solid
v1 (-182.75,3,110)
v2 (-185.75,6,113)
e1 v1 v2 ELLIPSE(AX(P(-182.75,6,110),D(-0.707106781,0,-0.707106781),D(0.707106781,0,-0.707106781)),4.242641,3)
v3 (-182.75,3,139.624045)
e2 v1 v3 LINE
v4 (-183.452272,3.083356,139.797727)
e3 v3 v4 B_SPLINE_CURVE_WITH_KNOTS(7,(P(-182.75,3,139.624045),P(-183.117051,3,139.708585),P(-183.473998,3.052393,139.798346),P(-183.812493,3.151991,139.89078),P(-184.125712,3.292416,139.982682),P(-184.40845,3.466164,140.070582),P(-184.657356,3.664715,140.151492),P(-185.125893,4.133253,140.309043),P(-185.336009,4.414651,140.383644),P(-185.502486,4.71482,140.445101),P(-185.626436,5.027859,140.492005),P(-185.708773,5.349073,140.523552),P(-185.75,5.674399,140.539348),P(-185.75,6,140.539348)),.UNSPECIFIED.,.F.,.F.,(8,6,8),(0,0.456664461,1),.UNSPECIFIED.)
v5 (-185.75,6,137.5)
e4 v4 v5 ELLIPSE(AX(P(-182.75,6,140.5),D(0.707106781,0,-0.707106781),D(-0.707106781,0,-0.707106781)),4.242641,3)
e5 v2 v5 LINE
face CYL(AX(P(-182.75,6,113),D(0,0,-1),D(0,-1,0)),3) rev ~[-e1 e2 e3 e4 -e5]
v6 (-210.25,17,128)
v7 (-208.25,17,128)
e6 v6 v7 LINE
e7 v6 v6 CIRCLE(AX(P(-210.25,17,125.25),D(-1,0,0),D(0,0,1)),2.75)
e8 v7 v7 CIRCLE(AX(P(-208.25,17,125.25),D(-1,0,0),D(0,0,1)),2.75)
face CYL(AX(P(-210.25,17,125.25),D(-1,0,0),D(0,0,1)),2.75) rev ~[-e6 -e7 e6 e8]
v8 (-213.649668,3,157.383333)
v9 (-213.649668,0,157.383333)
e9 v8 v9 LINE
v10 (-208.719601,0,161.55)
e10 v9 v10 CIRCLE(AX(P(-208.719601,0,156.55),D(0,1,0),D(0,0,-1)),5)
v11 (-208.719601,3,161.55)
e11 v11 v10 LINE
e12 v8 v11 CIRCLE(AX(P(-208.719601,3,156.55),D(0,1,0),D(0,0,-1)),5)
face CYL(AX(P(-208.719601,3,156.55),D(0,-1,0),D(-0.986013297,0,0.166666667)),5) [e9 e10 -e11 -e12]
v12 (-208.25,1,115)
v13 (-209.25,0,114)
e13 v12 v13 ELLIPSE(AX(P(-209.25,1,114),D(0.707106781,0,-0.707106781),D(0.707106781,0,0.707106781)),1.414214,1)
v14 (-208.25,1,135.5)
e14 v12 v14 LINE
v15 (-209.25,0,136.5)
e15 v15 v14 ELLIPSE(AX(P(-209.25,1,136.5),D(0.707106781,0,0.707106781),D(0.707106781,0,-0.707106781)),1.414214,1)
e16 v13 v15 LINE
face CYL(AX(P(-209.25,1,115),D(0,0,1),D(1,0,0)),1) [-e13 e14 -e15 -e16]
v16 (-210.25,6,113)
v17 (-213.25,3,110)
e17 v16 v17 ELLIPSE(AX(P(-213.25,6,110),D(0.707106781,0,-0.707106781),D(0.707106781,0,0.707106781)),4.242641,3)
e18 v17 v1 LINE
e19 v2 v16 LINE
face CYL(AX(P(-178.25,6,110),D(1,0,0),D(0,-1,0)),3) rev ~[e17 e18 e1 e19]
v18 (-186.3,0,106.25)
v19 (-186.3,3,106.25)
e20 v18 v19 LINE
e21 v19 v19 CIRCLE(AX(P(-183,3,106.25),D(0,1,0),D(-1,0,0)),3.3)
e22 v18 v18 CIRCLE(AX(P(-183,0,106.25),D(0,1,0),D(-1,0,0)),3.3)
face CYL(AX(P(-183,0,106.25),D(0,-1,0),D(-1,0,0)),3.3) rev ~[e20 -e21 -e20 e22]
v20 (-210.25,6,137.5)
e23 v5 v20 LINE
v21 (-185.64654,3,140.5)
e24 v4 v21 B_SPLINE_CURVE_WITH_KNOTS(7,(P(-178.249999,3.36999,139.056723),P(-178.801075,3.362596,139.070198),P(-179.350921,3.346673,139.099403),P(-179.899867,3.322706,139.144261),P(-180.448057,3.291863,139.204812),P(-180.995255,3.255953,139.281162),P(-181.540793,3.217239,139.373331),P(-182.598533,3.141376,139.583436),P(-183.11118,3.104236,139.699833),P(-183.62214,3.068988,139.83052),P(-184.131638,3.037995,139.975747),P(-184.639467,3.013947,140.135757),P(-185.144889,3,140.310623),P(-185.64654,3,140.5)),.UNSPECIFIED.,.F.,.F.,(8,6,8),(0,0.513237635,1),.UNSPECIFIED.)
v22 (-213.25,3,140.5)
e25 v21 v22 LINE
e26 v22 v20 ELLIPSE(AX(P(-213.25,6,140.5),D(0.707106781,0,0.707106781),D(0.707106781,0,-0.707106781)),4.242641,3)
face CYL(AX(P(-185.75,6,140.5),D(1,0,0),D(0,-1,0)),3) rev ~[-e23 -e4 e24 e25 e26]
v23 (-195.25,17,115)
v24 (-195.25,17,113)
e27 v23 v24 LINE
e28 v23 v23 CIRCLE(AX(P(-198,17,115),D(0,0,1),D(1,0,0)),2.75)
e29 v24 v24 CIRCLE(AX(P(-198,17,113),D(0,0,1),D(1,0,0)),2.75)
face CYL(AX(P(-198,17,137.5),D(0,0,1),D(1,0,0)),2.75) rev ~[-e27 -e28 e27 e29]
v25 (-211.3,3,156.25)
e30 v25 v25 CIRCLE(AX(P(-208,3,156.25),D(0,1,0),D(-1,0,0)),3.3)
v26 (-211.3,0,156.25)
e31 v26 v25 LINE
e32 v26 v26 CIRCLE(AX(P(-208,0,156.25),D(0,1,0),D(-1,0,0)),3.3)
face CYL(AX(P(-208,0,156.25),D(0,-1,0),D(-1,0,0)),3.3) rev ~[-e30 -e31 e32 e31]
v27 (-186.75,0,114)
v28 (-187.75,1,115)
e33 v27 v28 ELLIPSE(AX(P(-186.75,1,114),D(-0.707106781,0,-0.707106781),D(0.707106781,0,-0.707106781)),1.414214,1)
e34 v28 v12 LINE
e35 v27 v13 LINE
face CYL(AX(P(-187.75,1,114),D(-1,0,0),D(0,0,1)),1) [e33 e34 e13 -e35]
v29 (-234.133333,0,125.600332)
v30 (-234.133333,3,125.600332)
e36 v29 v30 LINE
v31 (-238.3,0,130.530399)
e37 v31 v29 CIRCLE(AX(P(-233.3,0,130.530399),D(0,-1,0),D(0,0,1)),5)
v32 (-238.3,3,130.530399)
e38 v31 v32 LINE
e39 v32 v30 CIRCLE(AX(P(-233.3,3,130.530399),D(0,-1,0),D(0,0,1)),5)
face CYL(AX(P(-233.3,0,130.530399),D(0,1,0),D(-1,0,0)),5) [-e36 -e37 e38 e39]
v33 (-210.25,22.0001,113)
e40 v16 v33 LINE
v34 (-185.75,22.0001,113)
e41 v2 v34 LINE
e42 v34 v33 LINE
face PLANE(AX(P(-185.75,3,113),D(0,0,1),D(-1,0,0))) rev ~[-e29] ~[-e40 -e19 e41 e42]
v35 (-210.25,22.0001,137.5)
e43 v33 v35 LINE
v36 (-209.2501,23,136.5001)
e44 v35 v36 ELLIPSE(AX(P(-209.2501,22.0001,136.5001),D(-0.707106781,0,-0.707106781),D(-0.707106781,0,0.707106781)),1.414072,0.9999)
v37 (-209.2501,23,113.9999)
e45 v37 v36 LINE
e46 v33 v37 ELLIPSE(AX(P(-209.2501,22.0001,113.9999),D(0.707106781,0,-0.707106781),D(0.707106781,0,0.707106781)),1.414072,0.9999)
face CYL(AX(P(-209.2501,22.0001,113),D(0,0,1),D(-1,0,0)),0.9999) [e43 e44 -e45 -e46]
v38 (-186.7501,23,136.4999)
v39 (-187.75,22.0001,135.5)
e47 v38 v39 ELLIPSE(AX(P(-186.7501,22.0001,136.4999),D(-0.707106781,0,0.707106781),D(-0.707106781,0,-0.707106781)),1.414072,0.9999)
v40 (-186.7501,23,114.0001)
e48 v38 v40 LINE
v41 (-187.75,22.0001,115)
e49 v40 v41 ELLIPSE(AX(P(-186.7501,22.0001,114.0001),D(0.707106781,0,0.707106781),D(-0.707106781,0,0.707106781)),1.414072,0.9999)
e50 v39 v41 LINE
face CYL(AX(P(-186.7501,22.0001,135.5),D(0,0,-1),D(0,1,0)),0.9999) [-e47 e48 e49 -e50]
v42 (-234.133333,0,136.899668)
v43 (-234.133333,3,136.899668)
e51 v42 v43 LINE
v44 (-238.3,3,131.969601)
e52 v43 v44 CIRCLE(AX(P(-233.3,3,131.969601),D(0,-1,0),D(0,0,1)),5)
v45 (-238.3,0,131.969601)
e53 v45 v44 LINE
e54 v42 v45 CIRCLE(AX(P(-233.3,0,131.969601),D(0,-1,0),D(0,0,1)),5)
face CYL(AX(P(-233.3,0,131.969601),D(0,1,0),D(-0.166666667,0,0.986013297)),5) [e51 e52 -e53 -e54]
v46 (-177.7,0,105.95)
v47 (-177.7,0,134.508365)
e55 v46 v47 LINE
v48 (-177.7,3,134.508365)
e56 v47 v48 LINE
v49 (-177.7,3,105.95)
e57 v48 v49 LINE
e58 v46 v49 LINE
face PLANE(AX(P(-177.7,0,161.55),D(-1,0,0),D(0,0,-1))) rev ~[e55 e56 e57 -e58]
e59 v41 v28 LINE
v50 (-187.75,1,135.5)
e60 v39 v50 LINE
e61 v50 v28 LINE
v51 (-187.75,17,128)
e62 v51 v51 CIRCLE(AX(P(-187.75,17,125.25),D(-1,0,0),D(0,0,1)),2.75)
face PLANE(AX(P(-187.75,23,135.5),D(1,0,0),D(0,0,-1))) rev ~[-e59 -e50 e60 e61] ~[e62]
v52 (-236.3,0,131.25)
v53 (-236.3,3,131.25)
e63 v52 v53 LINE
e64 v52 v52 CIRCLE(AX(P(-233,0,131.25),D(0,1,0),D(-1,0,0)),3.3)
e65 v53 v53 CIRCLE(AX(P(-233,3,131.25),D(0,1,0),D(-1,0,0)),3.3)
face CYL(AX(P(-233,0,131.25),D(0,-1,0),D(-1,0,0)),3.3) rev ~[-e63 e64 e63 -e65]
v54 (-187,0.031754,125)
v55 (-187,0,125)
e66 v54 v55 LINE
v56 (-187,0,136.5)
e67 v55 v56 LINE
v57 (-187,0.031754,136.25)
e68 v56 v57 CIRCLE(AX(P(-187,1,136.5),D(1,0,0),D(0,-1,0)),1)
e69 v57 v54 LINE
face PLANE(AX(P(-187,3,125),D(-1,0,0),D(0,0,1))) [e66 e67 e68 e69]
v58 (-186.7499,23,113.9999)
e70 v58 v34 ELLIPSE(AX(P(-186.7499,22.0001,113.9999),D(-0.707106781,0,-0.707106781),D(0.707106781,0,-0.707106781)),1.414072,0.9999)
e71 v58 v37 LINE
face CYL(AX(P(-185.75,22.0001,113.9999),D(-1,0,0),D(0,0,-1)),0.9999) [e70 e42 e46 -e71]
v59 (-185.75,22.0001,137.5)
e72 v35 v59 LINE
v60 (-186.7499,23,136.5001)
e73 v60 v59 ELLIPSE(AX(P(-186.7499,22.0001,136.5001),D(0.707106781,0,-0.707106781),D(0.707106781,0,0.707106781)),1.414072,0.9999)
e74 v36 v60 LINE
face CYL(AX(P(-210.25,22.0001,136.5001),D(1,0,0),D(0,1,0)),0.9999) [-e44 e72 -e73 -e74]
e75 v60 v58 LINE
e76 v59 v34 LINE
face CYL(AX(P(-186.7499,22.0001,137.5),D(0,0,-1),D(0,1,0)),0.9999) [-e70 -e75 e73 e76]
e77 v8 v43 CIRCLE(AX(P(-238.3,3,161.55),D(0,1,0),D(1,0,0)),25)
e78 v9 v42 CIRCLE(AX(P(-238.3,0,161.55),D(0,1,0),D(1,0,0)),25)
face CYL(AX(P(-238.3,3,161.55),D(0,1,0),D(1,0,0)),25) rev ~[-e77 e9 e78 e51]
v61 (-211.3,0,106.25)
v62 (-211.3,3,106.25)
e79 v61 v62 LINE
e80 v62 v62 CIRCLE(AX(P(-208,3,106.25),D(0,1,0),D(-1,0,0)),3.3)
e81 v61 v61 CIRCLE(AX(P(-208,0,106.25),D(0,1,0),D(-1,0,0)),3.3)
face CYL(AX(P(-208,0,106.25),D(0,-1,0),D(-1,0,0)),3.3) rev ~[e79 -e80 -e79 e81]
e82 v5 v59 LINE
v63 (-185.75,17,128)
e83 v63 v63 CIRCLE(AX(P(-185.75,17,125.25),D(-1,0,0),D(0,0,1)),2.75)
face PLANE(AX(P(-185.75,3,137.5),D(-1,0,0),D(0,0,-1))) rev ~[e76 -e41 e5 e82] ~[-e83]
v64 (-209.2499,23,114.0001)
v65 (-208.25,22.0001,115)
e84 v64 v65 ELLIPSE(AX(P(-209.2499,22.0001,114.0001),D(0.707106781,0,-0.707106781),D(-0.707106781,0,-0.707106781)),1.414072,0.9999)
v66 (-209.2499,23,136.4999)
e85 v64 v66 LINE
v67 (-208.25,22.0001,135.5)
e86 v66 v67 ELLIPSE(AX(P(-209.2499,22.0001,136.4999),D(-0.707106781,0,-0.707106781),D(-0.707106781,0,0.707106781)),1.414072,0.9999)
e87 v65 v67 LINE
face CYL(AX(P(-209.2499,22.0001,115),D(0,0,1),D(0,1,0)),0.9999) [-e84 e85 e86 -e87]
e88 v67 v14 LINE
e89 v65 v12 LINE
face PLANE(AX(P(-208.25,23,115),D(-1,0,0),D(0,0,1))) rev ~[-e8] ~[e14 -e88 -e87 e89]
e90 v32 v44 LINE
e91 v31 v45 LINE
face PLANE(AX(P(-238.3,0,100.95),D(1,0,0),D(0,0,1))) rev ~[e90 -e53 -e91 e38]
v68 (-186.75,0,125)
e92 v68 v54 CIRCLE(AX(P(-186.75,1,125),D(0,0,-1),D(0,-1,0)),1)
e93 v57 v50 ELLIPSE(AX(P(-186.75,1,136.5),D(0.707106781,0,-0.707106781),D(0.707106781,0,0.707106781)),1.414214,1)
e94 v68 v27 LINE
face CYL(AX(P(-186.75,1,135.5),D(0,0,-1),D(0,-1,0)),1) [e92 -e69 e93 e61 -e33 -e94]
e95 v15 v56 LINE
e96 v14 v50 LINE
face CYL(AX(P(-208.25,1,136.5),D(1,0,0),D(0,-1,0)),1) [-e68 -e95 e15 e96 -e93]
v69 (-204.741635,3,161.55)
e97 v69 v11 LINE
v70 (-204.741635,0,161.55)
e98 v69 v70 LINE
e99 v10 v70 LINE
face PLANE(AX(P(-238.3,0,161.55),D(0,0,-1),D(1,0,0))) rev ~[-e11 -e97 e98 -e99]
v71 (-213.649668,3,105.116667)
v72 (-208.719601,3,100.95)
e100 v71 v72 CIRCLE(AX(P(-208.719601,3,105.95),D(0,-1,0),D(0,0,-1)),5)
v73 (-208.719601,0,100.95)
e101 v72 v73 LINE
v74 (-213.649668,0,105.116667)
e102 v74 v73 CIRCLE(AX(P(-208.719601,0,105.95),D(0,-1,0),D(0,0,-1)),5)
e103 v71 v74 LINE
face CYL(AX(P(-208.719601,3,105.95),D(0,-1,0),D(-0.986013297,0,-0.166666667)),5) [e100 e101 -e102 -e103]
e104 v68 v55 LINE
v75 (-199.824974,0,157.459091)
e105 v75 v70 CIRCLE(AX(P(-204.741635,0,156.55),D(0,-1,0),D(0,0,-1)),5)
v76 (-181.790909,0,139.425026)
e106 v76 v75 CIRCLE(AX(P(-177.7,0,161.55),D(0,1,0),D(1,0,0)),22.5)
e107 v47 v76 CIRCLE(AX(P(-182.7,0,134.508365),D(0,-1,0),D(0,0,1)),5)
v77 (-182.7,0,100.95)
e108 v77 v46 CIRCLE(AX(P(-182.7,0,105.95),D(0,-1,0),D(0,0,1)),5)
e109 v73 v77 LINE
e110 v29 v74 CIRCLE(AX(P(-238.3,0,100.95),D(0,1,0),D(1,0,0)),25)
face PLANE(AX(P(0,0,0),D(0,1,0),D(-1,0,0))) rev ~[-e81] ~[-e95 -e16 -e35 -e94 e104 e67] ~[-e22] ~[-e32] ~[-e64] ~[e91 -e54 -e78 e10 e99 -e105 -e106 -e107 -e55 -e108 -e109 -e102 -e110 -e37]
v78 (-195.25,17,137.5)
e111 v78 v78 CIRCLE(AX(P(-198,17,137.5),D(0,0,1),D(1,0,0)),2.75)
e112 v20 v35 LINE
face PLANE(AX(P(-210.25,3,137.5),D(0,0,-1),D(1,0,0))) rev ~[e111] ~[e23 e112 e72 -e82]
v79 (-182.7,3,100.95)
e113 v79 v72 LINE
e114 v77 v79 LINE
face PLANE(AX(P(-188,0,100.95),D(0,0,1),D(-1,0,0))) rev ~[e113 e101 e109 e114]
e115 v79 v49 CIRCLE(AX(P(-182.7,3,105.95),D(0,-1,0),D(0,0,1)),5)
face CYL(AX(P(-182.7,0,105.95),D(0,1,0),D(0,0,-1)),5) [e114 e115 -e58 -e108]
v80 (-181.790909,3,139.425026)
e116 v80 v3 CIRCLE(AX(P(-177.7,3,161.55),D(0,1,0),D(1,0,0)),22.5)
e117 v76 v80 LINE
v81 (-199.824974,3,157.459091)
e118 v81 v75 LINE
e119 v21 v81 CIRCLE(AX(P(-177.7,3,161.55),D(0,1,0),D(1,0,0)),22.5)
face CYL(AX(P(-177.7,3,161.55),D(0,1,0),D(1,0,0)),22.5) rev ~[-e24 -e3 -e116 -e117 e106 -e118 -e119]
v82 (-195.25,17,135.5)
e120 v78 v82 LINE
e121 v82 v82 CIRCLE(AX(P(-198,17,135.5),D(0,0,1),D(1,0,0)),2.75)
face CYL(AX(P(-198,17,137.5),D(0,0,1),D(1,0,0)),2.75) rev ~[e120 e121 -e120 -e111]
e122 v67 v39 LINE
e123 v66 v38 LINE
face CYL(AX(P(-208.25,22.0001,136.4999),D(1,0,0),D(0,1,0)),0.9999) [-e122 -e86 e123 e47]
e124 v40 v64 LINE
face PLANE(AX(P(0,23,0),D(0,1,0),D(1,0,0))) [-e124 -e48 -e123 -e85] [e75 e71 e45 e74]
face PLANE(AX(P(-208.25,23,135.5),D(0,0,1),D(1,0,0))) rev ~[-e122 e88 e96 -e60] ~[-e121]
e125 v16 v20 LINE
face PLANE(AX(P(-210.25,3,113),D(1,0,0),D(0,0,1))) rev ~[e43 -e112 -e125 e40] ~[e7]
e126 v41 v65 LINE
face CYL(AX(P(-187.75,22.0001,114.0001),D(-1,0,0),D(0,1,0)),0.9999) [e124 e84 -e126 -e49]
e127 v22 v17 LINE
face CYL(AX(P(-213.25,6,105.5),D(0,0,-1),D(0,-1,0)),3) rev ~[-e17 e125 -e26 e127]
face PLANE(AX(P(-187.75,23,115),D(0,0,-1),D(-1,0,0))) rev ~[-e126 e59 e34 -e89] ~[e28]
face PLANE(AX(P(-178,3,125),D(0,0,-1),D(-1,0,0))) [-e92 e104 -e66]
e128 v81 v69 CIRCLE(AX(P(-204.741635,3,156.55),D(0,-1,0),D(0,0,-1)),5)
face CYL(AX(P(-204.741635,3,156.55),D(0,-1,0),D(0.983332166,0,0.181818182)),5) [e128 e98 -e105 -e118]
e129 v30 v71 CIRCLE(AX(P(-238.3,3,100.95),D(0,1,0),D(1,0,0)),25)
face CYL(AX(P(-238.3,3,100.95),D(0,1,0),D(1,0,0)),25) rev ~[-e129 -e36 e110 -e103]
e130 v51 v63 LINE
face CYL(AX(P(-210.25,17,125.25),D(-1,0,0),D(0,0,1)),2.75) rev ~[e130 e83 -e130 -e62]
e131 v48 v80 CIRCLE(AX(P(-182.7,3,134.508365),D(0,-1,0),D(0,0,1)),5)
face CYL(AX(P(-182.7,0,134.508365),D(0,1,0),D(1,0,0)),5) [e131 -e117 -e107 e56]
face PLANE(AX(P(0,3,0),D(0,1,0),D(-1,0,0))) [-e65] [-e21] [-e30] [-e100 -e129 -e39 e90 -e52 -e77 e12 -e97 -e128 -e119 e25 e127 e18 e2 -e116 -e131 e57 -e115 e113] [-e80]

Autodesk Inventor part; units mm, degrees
ref_plane "YZ Plane" through (0, 0, 0) normal (1, 0, 0) x (0, 1, 0)
ref_plane "XZ Plane" through (0, 0, 0) normal (0, 1, 0) x (-1, 0, 0)
ref_plane "XY Plane" through (0, 0, 0) normal (0, 0, 1) x (1, 0, 0)
sketch "Sketch1" plane through (0, 0, 0) normal (0, 1, 0) x (-1, 0, 0)
  line L0 (245.5, 243.75) -> (-204.5, 243.75)
  line L1 (-204.5, 243.75) -> (-204.5, -206.25)
  line L2 (-204.5, -206.25) -> (245.5, -206.25)
  line L3 (245.5, -206.25) -> (245.5, 243.75)
  circle A0 centre (233, 231.25) radius 3.3
  circle A1 centre (233, 206.25) radius 3.3
  circle A2 centre (233, 181.25) radius 3.3
  circle A3 centre (233, 156.25) radius 3.3
  circle A4 centre (233, 131.25) radius 3.3
  circle A5 centre (233, 106.25) radius 3.3
  circle A6 centre (233, 81.25) radius 3.3
  circle A7 centre (233, 56.25) radius 3.3
  circle A8 centre (233, 31.25) radius 3.3
  circle A9 centre (233, 6.25) radius 3.3
  circle A10 centre (233, -18.75) radius 3.3
  circle A11 centre (233, -43.75) radius 3.3
  circle A12 centre (233, -68.75) radius 3.3
  circle A13 centre (233, -93.75) radius 3.3
  circle A14 centre (233, -118.75) radius 3.3
  circle A15 centre (233, -143.75) radius 3.3
  circle A16 centre (233, -168.75) radius 3.3
  circle A17 centre (233, -193.75) radius 3.3
  circle A18 centre (208, 231.25) radius 3.3
  circle A19 centre (208, 206.25) radius 3.3
  circle A20 centre (208, 181.25) radius 3.3
  circle A21 centre (208, 156.25) radius 3.3
  circle A22 centre (208, 131.25) radius 3.3
  circle A23 centre (208, 106.25) radius 3.3
  circle A24 centre (208, 81.25) radius 3.3
  circle A25 centre (208, 56.25) radius 3.3
  circle A26 centre (208, 31.25) radius 3.3
  circle A27 centre (208, 6.25) radius 3.3
  circle A28 centre (208, -18.75) radius 3.3
  circle A29 centre (208, -43.75) radius 3.3
  circle A30 centre (208, -68.75) radius 3.3
  circle A31 centre (208, -93.75) radius 3.3
  circle A32 centre (208, -118.75) radius 3.3
  circle A33 centre (208, -143.75) radius 3.3
  circle A34 centre (208, -168.75) radius 3.3
  circle A35 centre (208, -193.75) radius 3.3
  circle A36 centre (183, 231.25) radius 3.3
  circle A37 centre (183, 206.25) radius 3.3
  circle A38 centre (183, 181.25) radius 3.3
  circle A39 centre (183, 156.25) radius 3.3
  circle A40 centre (183, 131.25) radius 3.3
  circle A41 centre (183, 106.25) radius 3.3
  circle A42 centre (183, 81.25) radius 3.3
  circle A43 centre (183, 56.25) radius 3.3
  circle A44 centre (183, 31.25) radius 3.3
  circle A45 centre (183, 6.25) radius 3.3
  circle A46 centre (183, -18.75) radius 3.3
  circle A47 centre (183, -43.75) radius 3.3
  circle A48 centre (183, -68.75) radius 3.3
  circle A49 centre (183, -93.75) radius 3.3
  circle A50 centre (183, -118.75) radius 3.3
  circle A51 centre (183, -143.75) radius 3.3
  circle A52 centre (183, -168.75) radius 3.3
  circle A53 centre (183, -193.75) radius 3.3
  circle A54 centre (158, 231.25) radius 3.3
  circle A55 centre (158, 206.25) radius 3.3
  circle A56 centre (158, 181.25) radius 3.3
  circle A57 centre (158, 156.25) radius 3.3
  circle A58 centre (158, 131.25) radius 3.3
  circle A59 centre (158, 106.25) radius 3.3
  circle A60 centre (158, 81.25) radius 3.3
  circle A61 centre (158, 56.25) radius 3.3
  circle A62 centre (158, 31.25) radius 3.3
  circle A63 centre (158, 6.25) radius 3.3
  circle A64 centre (158, -18.75) radius 3.3
  circle A65 centre (158, -43.75) radius 3.3
  circle A66 centre (158, -68.75) radius 3.3
  circle A67 centre (158, -93.75) radius 3.3
  circle A68 centre (158, -118.75) radius 3.3
  circle A69 centre (158, -143.75) radius 3.3
  circle A70 centre (158, -168.75) radius 3.3
  circle A71 centre (158, -193.75) radius 3.3
  circle A72 centre (133, 231.25) radius 3.3
  circle A73 centre (133, 206.25) radius 3.3
  circle A74 centre (133, 181.25) radius 3.3
  circle A75 centre (133, 156.25) radius 3.3
  circle A76 centre (133, 131.25) radius 3.3
  circle A77 centre (133, 106.25) radius 3.3
  circle A78 centre (133, 81.25) radius 3.3
  circle A79 centre (133, 56.25) radius 3.3
  circle A80 centre (133, 31.25) radius 3.3
  circle A81 centre (133, 6.25) radius 3.3
  circle A82 centre (133, -18.75) radius 3.3
  circle A83 centre (133, -43.75) radius 3.3
  circle A84 centre (133, -68.75) radius 3.3
  circle A85 centre (133, -93.75) radius 3.3
  circle A86 centre (133, -118.75) radius 3.3
  circle A87 centre (133, -143.75) radius 3.3
  circle A88 centre (133, -168.75) radius 3.3
  circle A89 centre (133, -193.75) radius 3.3
  circle A90 centre (108, 231.25) radius 3.3
  circle A91 centre (108, 206.25) radius 3.3
  circle A92 centre (108, 181.25) radius 3.3
  circle A93 centre (108, 156.25) radius 3.3
  circle A94 centre (108, 131.25) radius 3.3
  circle A95 centre (108, 106.25) radius 3.3
  circle A96 centre (108, 81.25) radius 3.3
  circle A97 centre (108, 56.25) radius 3.3
  circle A98 centre (108, 31.25) radius 3.3
  circle A99 centre (108, 6.25) radius 3.3
  circle A100 centre (108, -18.75) radius 3.3
  circle A101 centre (108, -43.75) radius 3.3
  circle A102 centre (108, -68.75) radius 3.3
  circle A103 centre (108, -93.75) radius 3.3
  circle A104 centre (108, -118.75) radius 3.3
  circle A105 centre (108, -143.75) radius 3.3
  circle A106 centre (108, -168.75) radius 3.3
  circle A107 centre (108, -193.75) radius 3.3
  circle A108 centre (83, 231.25) radius 3.3
  circle A109 centre (83, 206.25) radius 3.3
  circle A110 centre (83, 181.25) radius 3.3
  circle A111 centre (83, 156.25) radius 3.3
  circle A112 centre (83, 131.25) radius 3.3
  circle A113 centre (83, 106.25) radius 3.3
  circle A114 centre (83, 81.25) radius 3.3
  circle A115 centre (83, 56.25) radius 3.3
  circle A116 centre (83, 31.25) radius 3.3
  circle A117 centre (83, 6.25) radius 3.3
  circle A118 centre (83, -18.75) radius 3.3
  circle A119 centre (83, -43.75) radius 3.3
  circle A120 centre (83, -68.75) radius 3.3
  circle A121 centre (83, -93.75) radius 3.3
  circle A122 centre (83, -118.75) radius 3.3
  circle A123 centre (83, -143.75) radius 3.3
  circle A124 centre (83, -168.75) radius 3.3
  circle A125 centre (83, -193.75) radius 3.3
  circle A126 centre (58, 231.25) radius 3.3
  circle A127 centre (58, 206.25) radius 3.3
  circle A128 centre (58, 181.25) radius 3.3
  circle A129 centre (58, 156.25) radius 3.3
  circle A130 centre (58, 131.25) radius 3.3
  circle A131 centre (58, 106.25) radius 3.3
  circle A132 centre (58, 81.25) radius 3.3
  circle A133 centre (58, 56.25) radius 3.3
  circle A134 centre (58, 31.25) radius 3.3
  circle A135 centre (58, 6.25) radius 3.3
  circle A136 centre (58, -18.75) radius 3.3
  circle A137 centre (58, -43.75) radius 3.3
  circle A138 centre (58, -68.75) radius 3.3
  circle A139 centre (58, -93.75) radius 3.3
  circle A140 centre (58, -118.75) radius 3.3
  circle A141 centre (58, -143.75) radius 3.3
  circle A142 centre (58, -168.75) radius 3.3
  circle A143 centre (58, -193.75) radius 3.3
  circle A144 centre (33, 231.25) radius 3.3
  circle A145 centre (33, 206.25) radius 3.3
  circle A146 centre (33, 181.25) radius 3.3
  circle A147 centre (33, 156.25) radius 3.3
  circle A148 centre (33, 131.25) radius 3.3
  circle A149 centre (33, 106.25) radius 3.3
  circle A150 centre (33, 81.25) radius 3.3
  circle A151 centre (33, 56.25) radius 3.3
  circle A152 centre (33, 31.25) radius 3.3
  circle A153 centre (33, 6.25) radius 3.3
  circle A154 centre (33, -18.75) radius 3.3
  circle A155 centre (33, -43.75) radius 3.3
  circle A156 centre (33, -68.75) radius 3.3
  circle A157 centre (33, -93.75) radius 3.3
  circle A158 centre (33, -118.75) radius 3.3
  circle A159 centre (33, -143.75) radius 3.3
  circle A160 centre (33, -168.75) radius 3.3
  circle A161 centre (33, -193.75) radius 3.3
  circle A162 centre (8, 231.25) radius 3.3
  circle A163 centre (8, 206.25) radius 3.3
  circle A164 centre (8, 181.25) radius 3.3
  circle A165 centre (8, 156.25) radius 3.3
  circle A166 centre (8, 131.25) radius 3.3
  circle A167 centre (8, 106.25) radius 3.3
  circle A168 centre (8, 81.25) radius 3.3
  circle A169 centre (8, 56.25) radius 3.3
  circle A170 centre (8, 31.25) radius 3.3
  circle A171 centre (8, 6.25) radius 3.3
  circle A172 centre (8, -18.75) radius 3.3
  circle A173 centre (8, -43.75) radius 3.3
  circle A174 centre (8, -68.75) radius 3.3
  circle A175 centre (8, -93.75) radius 3.3
  circle A176 centre (8, -118.75) radius 3.3
  circle A177 centre (8, -143.75) radius 3.3
  circle A178 centre (8, -168.75) radius 3.3
  circle A179 centre (8, -193.75) radius 3.3
  circle A180 centre (-17, 231.25) radius 3.3
  circle A181 centre (-17, 206.25) radius 3.3
  circle A182 centre (-17, 181.25) radius 3.3
  circle A183 centre (-17, 156.25) radius 3.3
  circle A184 centre (-17, 131.25) radius 3.3
  circle A185 centre (-17, 106.25) radius 3.3
  circle A186 centre (-17, 81.25) radius 3.3
  circle A187 centre (-17, 56.25) radius 3.3
  circle A188 centre (-17, 31.25) radius 3.3
  circle A189 centre (-17, 6.25) radius 3.3
  circle A190 centre (-17, -18.75) radius 3.3
  circle A191 centre (-17, -43.75) radius 3.3
  circle A192 centre (-17, -68.75) radius 3.3
  circle A193 centre (-17, -93.75) radius 3.3
  circle A194 centre (-17, -118.75) radius 3.3
  circle A195 centre (-17, -143.75) radius 3.3
  circle A196 centre (-17, -168.75) radius 3.3
  circle A197 centre (-17, -193.75) radius 3.3
  circle A198 centre (-42, 231.25) radius 3.3
  circle A199 centre (-42, 206.25) radius 3.3
  circle A200 centre (-42, 181.25) radius 3.3
  circle A201 centre (-42, 156.25) radius 3.3
  circle A202 centre (-42, 131.25) radius 3.3
  circle A203 centre (-42, 106.25) radius 3.3
  circle A204 centre (-42, 81.25) radius 3.3
  circle A205 centre (-42, 56.25) radius 3.3
  circle A206 centre (-42, 31.25) radius 3.3
  circle A207 centre (-42, 6.25) radius 3.3
  circle A208 centre (-42, -18.75) radius 3.3
  circle A209 centre (-42, -43.75) radius 3.3
  circle A210 centre (-42, -68.75) radius 3.3
  circle A211 centre (-42, -93.75) radius 3.3
  circle A212 centre (-42, -118.75) radius 3.3
  circle A213 centre (-42, -143.75) radius 3.3
  circle A214 centre (-42, -168.75) radius 3.3
  circle A215 centre (-42, -193.75) radius 3.3
  circle A216 centre (-67, 231.25) radius 3.3
  circle A217 centre (-67, 206.25) radius 3.3
  circle A218 centre (-67, 181.25) radius 3.3
  circle A219 centre (-67, 156.25) radius 3.3
  circle A220 centre (-67, 131.25) radius 3.3
  circle A221 centre (-67, 106.25) radius 3.3
  circle A222 centre (-67, 81.25) radius 3.3
  circle A223 centre (-67, 56.25) radius 3.3
  circle A224 centre (-67, 31.25) radius 3.3
  circle A225 centre (-67, 6.25) radius 3.3
  circle A226 centre (-67, -18.75) radius 3.3
  circle A227 centre (-67, -43.75) radius 3.3
  circle A228 centre (-67, -68.75) radius 3.3
  circle A229 centre (-67, -93.75) radius 3.3
  circle A230 centre (-67, -118.75) radius 3.3
  circle A231 centre (-67, -143.75) radius 3.3
  circle A232 centre (-67, -168.75) radius 3.3
  circle A233 centre (-67, -193.75) radius 3.3
  circle A234 centre (-92, 231.25) radius 3.3
  circle A235 centre (-92, 206.25) radius 3.3
  circle A236 centre (-92, 181.25) radius 3.3
  circle A237 centre (-92, 156.25) radius 3.3
  circle A238 centre (-92, 131.25) radius 3.3
  circle A239 centre (-92, 106.25) radius 3.3
  circle A240 centre (-92, 81.25) radius 3.3
  circle A241 centre (-92, 56.25) radius 3.3
  circle A242 centre (-92, 31.25) radius 3.3
  circle A243 centre (-92, 6.25) radius 3.3
  circle A244 centre (-92, -18.75) radius 3.3
  circle A245 centre (-92, -43.75) radius 3.3
  circle A246 centre (-92, -68.75) radius 3.3
  circle A247 centre (-92, -93.75) radius 3.3
  circle A248 centre (-92, -118.75) radius 3.3
  circle A249 centre (-92, -143.75) radius 3.3
  circle A250 centre (-92, -168.75) radius 3.3
  circle A251 centre (-92, -193.75) radius 3.3
  circle A252 centre (-117, 231.25) radius 3.3
  circle A253 centre (-117, 206.25) radius 3.3
  circle A254 centre (-117, 181.25) radius 3.3
  circle A255 centre (-117, 156.25) radius 3.3
  circle A256 centre (-117, 131.25) radius 3.3
  circle A257 centre (-117, 106.25) radius 3.3
  circle A258 centre (-117, 81.25) radius 3.3
  circle A259 centre (-117, 56.25) radius 3.3
  circle A260 centre (-117, 31.25) radius 3.3
  circle A261 centre (-117, 6.25) radius 3.3
  circle A262 centre (-117, -18.75) radius 3.3
  circle A263 centre (-117, -43.75) radius 3.3
  circle A264 centre (-117, -68.75) radius 3.3
  circle A265 centre (-117, -93.75) radius 3.3
  circle A266 centre (-117, -118.75) radius 3.3
  circle A267 centre (-117, -143.75) radius 3.3
  circle A268 centre (-117, -168.75) radius 3.3
  circle A269 centre (-117, -193.75) radius 3.3
  circle A270 centre (-142, 231.25) radius 3.3
  circle A271 centre (-142, 206.25) radius 3.3
  circle A272 centre (-142, 181.25) radius 3.3
  circle A273 centre (-142, 156.25) radius 3.3
  circle A274 centre (-142, 131.25) radius 3.3
  circle A275 centre (-142, 106.25) radius 3.3
  circle A276 centre (-142, 81.25) radius 3.3
  circle A277 centre (-142, 56.25) radius 3.3
  circle A278 centre (-142, 31.25) radius 3.3
  circle A279 centre (-142, 6.25) radius 3.3
  circle A280 centre (-142, -18.75) radius 3.3
  circle A281 centre (-142, -43.75) radius 3.3
  circle A282 centre (-142, -68.75) radius 3.3
  circle A283 centre (-142, -93.75) radius 3.3
  circle A284 centre (-142, -118.75) radius 3.3
  circle A285 centre (-142, -143.75) radius 3.3
  circle A286 centre (-142, -168.75) radius 3.3
  circle A287 centre (-142, -193.75) radius 3.3
  circle A288 centre (-167, 231.25) radius 3.3
  circle A289 centre (-167, 206.25) radius 3.3
  circle A290 centre (-167, 181.25) radius 3.3
  circle A291 centre (-167, 156.25) radius 3.3
  circle A292 centre (-167, 131.25) radius 3.3
  circle A293 centre (-167, 106.25) radius 3.3
  circle A294 centre (-167, 81.25) radius 3.3
  circle A295 centre (-167, 56.25) radius 3.3
  circle A296 centre (-167, 31.25) radius 3.3
  circle A297 centre (-167, 6.25) radius 3.3
  circle A298 centre (-167, -18.75) radius 3.3
  circle A299 centre (-167, -43.75) radius 3.3
  circle A300 centre (-167, -68.75) radius 3.3
  circle A301 centre (-167, -93.75) radius 3.3
  circle A302 centre (-167, -118.75) radius 3.3
  circle A303 centre (-167, -143.75) radius 3.3
  circle A304 centre (-167, -168.75) radius 3.3
  circle A305 centre (-167, -193.75) radius 3.3
  circle A306 centre (-192, 231.25) radius 3.3
  circle A307 centre (-192, 206.25) radius 3.3
  circle A308 centre (-192, 181.25) radius 3.3
  circle A309 centre (-192, 156.25) radius 3.3
  circle A310 centre (-192, 131.25) radius 3.3
  circle A311 centre (-192, 106.25) radius 3.3
  circle A312 centre (-192, 81.25) radius 3.3
  circle A313 centre (-192, 56.25) radius 3.3
  circle A314 centre (-192, 31.25) radius 3.3
  circle A315 centre (-192, 6.25) radius 3.3
  circle A316 centre (-192, -18.75) radius 3.3
  circle A317 centre (-192, -43.75) radius 3.3
  circle A318 centre (-192, -68.75) radius 3.3
  circle A319 centre (-192, -93.75) radius 3.3
  circle A320 centre (-192, -118.75) radius 3.3
  circle A321 centre (-192, -143.75) radius 3.3
  circle A322 centre (-192, -168.75) radius 3.3
  circle A323 centre (-192, -193.75) radius 3.3
  line L4 (208, 241.25) -> (168, 241.25)
  line L5 (168, 241.25) -> (168, 221.25)
  line L6 (168, 221.25) -> (208, 221.25)
  line L7 (208, 221.25) -> (208, 241.25)
  line L8 (208, -203.75) -> (168, -203.75)
  line L9 (168, -203.75) -> (168, -183.75)
  line L10 (168, -183.75) -> (208, -183.75)
  line L11 (208, -183.75) -> (208, -203.75)
  line L12 (188, 221.25) -> (168, 221.25)
  line L13 (168, 221.25) -> (168, -183.75)
  line L14 (168, -183.75) -> (188, -183.75)
  line L15 (188, -183.75) -> (188, 221.25)
  line L16 (168, -5.25) -> (188, -5.25)
  line L17 (188, -5.25) -> (188, 42.75)
  line L18 (188, 42.75) -> (168, 42.75)
  line L19 (168, 42.75) -> (168, -5.25)
  line L20 (168, 42.75) -> (188, 42.75)
  line L21 (188, 42.75) -> (188, 65.75)
  line L22 (188, 65.75) -> (168, 65.75)
  line L23 (168, 65.75) -> (168, 42.75)
  line L24 (188, -5.25) -> (168, -5.25)
  line L25 (168, -5.25) -> (168, -28.25)
  line L26 (168, -28.25) -> (188, -28.25)
  line L27 (188, -28.25) -> (188, -5.25)
  line L28 (188, 65.75) -> (168, 65.75)
  line L29 (168, 65.75) -> (168, 113.75)
  line L30 (168, 113.75) -> (188, 113.75)
  line L31 (188, 113.75) -> (188, 65.75)
  line L32 (188, 113.75) -> (168, 113.75)
  line L33 (168, 113.75) -> (168, 136.75)
  line L34 (168, 136.75) -> (188, 136.75)
  line L35 (188, 136.75) -> (188, 113.75)
  line L36 (188, 135.25) -> (208, 135.25)
  line L37 (208, 135.25) -> (208, 115.25)
  line L38 (208, 115.25) -> (188, 115.25)
  line L39 (188, 115.25) -> (188, 135.25)
  line L40 (177.7, 100.95) -> (238.3, 100.95)
  line L41 (238.3, 100.95) -> (238.3, 161.55)
  line L42 (238.3, 161.55) -> (177.7, 161.55)
  line L43 (177.7, 161.55) -> (177.7, 100.95)
  point P0 (0, 0)
  dimension "d0" = 450
  dimension "d1" = 450
  dimension "d2" = 6.6
  dimension "d3" = 12.5
  dimension "d4" = 12.5
  dimension "d7" = 25
  dimension "d10" = 25
  dimension "d13" = 40
  dimension "d14" = 20
  dimension "d15" = 2.5
  dimension "d16" = 2.5
  dimension "d17" = 20
  dimension "d21" = 48
  dimension "d22" = 178.5
  dimension "d23" = 178.5
  dimension "d24" = 23
  dimension "d25" = 23
  dimension "d26" = 48
  dimension "d27" = 23
  dimension "d28" = 20
  dimension "d29" = 20
  dimension "d30" = 1.5
  dimension "d31" = 60.6
  dimension "d32" = 5.3
  dimension "d33" = 5.3
  dimension "d34" = 5.3
  dimension "d75" = 0
  dimension "d76" = 0
  dimension "d77" = 40
sketch "Sketch2" plane through (0, 0, 0) normal (0, 1, 0) x (-1, 0, 0)
  point P0 (0, 0)
extrude "Extrusion1" add sketch "Sketch1" along normal blind 3 contours L42 L41 L40 L15 L38 L37 A22 L36 | L15 L34 L43 L42 | L15 L30 L43 L34 | L30 L15 L40 L43 | A22 L37 picked at (209.1, 131.25)
sketch "Sketch4" plane through (0, 3, 0) normal (0, 1, 0) x (1, 0, 0)
  line L0 (-210.25, -137.5) -> (-185.75, -137.5)
  line L1 (-185.75, -137.5) -> (-185.75, -113)
  line L2 (-185.75, -113) -> (-210.25, -113)
  line L3 (-210.25, -113) -> (-210.25, -137.5)
  line L4 (-187.75, -135.5) -> (-208.25, -135.5) projected
  line L5 (-208.25, -135.5) -> (-208.25, -115) projected
  point P0 (0, 0)
  dimension "d43" = 24.5
  dimension "d44" = 24.5
  dimension "d45" = 2
  dimension "d46" = 2
extrude "Extrusion3" add sketch "Sketch4" along normal blind 20
sketch "Sketch5" plane through (0, 23, 0) normal (0, 1, 0) x (1, 0, 0)
  line L0 (-208.25, -135.5) -> (-187.75, -135.5)
  line L1 (-187.75, -135.5) -> (-187.75, -115)
  line L2 (-187.75, -115) -> (-208.25, -115)
  line L3 (-208.25, -115) -> (-208.25, -135.5)
  line L4 (-210.25, -113) -> (-210.25, -137.5) projected
  line L5 (-210.25, -137.5) -> (-185.75, -137.5) projected
  point P0 (0, 0)
  dimension "d49" = 20.5
  dimension "d50" = 20.5
  dimension "d51" = 2
  dimension "d52" = 2
extrude "Extrusion4" cut sketch "Sketch5" against normal blind 25
fillet "Fillet1" [suppressed]
sketch "Sketch7" plane through (-207.25, 6, 137.5) normal (0, 0, 1) x (1, 0, 0)
  circle A0 centre (9.25, 11) radius 2.75
  line L0 (-3, 17) -> (21.5, 17) projected
  line L1 (-3, 17) -> (-3, 0) projected
  point P0 (207.25, -6)
  point P1 (0, 17)
  point P2 (18.5, 17)
  dimension "d63" = 5.5
  dimension "d64" = 6
  dimension "d65" = 12.25
extrude "Extrusion6" cut sketch "Sketch7" against normal blind 25
sketch "Sketch8" plane through (-210.25, 6, 116) normal (-1, 0, 0) x (0, 0, 1)
  circle A0 centre (9.25, 11) radius 2.75
  line L0 (-3, 17) -> (21.5, 17) projected
  line L1 (-3, 17) -> (-3, 0) projected
  point P0 (-116, -6)
  point P1 (0, 17)
  point P2 (18.5, 17)
  dimension "d68" = 5.5
  dimension "d69" = 6
  dimension "d70" = 12.25
extrude "Extrusion7" cut sketch "Sketch8" against normal blind 25
fillet "Fillet3" radius 1 8 edges at (-210.25, 23, 125.25) (-198, 23, 137.5) (-185.75, 23, 125.25) (-198, 23, 113) (-198, 23, 115) (-208.25, 23, 125.25) (-187.75, 23, 125.25) (-198, 23, 135.5)
fillet "Fillet4" radius 1 4 edges at (-198, 0, 135.5) (-208.25, 0, 125.25) (-187.75, 0, 125.25) (-198, 0, 115)
sketch "Sketch9" plane through (0, 3, 0) normal (0, 1, 0) x (1, 0, 0)
  line L0 (-238.3, -161.55) -> (-177.7, -161.55) projected
  circle A0 centre (-238.3, -161.55) radius 25
  line L1 (-177.7, -100.95) -> (-238.3, -100.95) projected
  circle A1 centre (-238.3, -100.95) radius 25
  point P0 (0, 0)
  dimension "d78" = 50
  dimension "d79" = 50
extrude "Extrusion8" cut sketch "Sketch9" against normal blind 25
sketch "Sketch10" plane through (0, 3, 0) normal (0, 1, 0) x (1, 0, 0)
  line L0 (-178, -125) -> (-187, -125)
  line L1 (-187, -125) -> (-187, -137.5)
  line L2 (-187, -137.5) -> (-178, -137.5)
  line L3 (-178, -137.5) -> (-178, -125)
  point P0 (0, 0)
extrude "Extrusion9" add sketch "Sketch10" against normal blind 3
sketch "Sketch11" plane through (0, 3, 0) normal (0, 1, 0) x (1, 0, 0)
  line L0 (-213.3, -161.55) -> (-177.7, -161.55) projected
  circle A0 centre (-177.7, -161.55) radius 22.5
  point P0 (0, 0)
  dimension "d84" = 45
extrude "Extrusion10" cut sketch "Sketch11" against normal blind 3
fillet "Fillet5" radius 3 4 edges at (-210.25, 3, 125.25) (-198, 3, 113) (-185.75, 3, 125.25) (-198, 3, 137.5)
fillet "Fillet6" radius 5 7 edges at (-238.3, 1.5, 136.55) (-238.3, 1.5, 125.95) (-213.3, 1.5, 100.95) (-213.3, 1.5, 161.55) (-200.2, 1.5, 161.55) (-177.7, 1.5, 139.05) (-177.7, 1.5, 100.95)
properties part number "overview"
